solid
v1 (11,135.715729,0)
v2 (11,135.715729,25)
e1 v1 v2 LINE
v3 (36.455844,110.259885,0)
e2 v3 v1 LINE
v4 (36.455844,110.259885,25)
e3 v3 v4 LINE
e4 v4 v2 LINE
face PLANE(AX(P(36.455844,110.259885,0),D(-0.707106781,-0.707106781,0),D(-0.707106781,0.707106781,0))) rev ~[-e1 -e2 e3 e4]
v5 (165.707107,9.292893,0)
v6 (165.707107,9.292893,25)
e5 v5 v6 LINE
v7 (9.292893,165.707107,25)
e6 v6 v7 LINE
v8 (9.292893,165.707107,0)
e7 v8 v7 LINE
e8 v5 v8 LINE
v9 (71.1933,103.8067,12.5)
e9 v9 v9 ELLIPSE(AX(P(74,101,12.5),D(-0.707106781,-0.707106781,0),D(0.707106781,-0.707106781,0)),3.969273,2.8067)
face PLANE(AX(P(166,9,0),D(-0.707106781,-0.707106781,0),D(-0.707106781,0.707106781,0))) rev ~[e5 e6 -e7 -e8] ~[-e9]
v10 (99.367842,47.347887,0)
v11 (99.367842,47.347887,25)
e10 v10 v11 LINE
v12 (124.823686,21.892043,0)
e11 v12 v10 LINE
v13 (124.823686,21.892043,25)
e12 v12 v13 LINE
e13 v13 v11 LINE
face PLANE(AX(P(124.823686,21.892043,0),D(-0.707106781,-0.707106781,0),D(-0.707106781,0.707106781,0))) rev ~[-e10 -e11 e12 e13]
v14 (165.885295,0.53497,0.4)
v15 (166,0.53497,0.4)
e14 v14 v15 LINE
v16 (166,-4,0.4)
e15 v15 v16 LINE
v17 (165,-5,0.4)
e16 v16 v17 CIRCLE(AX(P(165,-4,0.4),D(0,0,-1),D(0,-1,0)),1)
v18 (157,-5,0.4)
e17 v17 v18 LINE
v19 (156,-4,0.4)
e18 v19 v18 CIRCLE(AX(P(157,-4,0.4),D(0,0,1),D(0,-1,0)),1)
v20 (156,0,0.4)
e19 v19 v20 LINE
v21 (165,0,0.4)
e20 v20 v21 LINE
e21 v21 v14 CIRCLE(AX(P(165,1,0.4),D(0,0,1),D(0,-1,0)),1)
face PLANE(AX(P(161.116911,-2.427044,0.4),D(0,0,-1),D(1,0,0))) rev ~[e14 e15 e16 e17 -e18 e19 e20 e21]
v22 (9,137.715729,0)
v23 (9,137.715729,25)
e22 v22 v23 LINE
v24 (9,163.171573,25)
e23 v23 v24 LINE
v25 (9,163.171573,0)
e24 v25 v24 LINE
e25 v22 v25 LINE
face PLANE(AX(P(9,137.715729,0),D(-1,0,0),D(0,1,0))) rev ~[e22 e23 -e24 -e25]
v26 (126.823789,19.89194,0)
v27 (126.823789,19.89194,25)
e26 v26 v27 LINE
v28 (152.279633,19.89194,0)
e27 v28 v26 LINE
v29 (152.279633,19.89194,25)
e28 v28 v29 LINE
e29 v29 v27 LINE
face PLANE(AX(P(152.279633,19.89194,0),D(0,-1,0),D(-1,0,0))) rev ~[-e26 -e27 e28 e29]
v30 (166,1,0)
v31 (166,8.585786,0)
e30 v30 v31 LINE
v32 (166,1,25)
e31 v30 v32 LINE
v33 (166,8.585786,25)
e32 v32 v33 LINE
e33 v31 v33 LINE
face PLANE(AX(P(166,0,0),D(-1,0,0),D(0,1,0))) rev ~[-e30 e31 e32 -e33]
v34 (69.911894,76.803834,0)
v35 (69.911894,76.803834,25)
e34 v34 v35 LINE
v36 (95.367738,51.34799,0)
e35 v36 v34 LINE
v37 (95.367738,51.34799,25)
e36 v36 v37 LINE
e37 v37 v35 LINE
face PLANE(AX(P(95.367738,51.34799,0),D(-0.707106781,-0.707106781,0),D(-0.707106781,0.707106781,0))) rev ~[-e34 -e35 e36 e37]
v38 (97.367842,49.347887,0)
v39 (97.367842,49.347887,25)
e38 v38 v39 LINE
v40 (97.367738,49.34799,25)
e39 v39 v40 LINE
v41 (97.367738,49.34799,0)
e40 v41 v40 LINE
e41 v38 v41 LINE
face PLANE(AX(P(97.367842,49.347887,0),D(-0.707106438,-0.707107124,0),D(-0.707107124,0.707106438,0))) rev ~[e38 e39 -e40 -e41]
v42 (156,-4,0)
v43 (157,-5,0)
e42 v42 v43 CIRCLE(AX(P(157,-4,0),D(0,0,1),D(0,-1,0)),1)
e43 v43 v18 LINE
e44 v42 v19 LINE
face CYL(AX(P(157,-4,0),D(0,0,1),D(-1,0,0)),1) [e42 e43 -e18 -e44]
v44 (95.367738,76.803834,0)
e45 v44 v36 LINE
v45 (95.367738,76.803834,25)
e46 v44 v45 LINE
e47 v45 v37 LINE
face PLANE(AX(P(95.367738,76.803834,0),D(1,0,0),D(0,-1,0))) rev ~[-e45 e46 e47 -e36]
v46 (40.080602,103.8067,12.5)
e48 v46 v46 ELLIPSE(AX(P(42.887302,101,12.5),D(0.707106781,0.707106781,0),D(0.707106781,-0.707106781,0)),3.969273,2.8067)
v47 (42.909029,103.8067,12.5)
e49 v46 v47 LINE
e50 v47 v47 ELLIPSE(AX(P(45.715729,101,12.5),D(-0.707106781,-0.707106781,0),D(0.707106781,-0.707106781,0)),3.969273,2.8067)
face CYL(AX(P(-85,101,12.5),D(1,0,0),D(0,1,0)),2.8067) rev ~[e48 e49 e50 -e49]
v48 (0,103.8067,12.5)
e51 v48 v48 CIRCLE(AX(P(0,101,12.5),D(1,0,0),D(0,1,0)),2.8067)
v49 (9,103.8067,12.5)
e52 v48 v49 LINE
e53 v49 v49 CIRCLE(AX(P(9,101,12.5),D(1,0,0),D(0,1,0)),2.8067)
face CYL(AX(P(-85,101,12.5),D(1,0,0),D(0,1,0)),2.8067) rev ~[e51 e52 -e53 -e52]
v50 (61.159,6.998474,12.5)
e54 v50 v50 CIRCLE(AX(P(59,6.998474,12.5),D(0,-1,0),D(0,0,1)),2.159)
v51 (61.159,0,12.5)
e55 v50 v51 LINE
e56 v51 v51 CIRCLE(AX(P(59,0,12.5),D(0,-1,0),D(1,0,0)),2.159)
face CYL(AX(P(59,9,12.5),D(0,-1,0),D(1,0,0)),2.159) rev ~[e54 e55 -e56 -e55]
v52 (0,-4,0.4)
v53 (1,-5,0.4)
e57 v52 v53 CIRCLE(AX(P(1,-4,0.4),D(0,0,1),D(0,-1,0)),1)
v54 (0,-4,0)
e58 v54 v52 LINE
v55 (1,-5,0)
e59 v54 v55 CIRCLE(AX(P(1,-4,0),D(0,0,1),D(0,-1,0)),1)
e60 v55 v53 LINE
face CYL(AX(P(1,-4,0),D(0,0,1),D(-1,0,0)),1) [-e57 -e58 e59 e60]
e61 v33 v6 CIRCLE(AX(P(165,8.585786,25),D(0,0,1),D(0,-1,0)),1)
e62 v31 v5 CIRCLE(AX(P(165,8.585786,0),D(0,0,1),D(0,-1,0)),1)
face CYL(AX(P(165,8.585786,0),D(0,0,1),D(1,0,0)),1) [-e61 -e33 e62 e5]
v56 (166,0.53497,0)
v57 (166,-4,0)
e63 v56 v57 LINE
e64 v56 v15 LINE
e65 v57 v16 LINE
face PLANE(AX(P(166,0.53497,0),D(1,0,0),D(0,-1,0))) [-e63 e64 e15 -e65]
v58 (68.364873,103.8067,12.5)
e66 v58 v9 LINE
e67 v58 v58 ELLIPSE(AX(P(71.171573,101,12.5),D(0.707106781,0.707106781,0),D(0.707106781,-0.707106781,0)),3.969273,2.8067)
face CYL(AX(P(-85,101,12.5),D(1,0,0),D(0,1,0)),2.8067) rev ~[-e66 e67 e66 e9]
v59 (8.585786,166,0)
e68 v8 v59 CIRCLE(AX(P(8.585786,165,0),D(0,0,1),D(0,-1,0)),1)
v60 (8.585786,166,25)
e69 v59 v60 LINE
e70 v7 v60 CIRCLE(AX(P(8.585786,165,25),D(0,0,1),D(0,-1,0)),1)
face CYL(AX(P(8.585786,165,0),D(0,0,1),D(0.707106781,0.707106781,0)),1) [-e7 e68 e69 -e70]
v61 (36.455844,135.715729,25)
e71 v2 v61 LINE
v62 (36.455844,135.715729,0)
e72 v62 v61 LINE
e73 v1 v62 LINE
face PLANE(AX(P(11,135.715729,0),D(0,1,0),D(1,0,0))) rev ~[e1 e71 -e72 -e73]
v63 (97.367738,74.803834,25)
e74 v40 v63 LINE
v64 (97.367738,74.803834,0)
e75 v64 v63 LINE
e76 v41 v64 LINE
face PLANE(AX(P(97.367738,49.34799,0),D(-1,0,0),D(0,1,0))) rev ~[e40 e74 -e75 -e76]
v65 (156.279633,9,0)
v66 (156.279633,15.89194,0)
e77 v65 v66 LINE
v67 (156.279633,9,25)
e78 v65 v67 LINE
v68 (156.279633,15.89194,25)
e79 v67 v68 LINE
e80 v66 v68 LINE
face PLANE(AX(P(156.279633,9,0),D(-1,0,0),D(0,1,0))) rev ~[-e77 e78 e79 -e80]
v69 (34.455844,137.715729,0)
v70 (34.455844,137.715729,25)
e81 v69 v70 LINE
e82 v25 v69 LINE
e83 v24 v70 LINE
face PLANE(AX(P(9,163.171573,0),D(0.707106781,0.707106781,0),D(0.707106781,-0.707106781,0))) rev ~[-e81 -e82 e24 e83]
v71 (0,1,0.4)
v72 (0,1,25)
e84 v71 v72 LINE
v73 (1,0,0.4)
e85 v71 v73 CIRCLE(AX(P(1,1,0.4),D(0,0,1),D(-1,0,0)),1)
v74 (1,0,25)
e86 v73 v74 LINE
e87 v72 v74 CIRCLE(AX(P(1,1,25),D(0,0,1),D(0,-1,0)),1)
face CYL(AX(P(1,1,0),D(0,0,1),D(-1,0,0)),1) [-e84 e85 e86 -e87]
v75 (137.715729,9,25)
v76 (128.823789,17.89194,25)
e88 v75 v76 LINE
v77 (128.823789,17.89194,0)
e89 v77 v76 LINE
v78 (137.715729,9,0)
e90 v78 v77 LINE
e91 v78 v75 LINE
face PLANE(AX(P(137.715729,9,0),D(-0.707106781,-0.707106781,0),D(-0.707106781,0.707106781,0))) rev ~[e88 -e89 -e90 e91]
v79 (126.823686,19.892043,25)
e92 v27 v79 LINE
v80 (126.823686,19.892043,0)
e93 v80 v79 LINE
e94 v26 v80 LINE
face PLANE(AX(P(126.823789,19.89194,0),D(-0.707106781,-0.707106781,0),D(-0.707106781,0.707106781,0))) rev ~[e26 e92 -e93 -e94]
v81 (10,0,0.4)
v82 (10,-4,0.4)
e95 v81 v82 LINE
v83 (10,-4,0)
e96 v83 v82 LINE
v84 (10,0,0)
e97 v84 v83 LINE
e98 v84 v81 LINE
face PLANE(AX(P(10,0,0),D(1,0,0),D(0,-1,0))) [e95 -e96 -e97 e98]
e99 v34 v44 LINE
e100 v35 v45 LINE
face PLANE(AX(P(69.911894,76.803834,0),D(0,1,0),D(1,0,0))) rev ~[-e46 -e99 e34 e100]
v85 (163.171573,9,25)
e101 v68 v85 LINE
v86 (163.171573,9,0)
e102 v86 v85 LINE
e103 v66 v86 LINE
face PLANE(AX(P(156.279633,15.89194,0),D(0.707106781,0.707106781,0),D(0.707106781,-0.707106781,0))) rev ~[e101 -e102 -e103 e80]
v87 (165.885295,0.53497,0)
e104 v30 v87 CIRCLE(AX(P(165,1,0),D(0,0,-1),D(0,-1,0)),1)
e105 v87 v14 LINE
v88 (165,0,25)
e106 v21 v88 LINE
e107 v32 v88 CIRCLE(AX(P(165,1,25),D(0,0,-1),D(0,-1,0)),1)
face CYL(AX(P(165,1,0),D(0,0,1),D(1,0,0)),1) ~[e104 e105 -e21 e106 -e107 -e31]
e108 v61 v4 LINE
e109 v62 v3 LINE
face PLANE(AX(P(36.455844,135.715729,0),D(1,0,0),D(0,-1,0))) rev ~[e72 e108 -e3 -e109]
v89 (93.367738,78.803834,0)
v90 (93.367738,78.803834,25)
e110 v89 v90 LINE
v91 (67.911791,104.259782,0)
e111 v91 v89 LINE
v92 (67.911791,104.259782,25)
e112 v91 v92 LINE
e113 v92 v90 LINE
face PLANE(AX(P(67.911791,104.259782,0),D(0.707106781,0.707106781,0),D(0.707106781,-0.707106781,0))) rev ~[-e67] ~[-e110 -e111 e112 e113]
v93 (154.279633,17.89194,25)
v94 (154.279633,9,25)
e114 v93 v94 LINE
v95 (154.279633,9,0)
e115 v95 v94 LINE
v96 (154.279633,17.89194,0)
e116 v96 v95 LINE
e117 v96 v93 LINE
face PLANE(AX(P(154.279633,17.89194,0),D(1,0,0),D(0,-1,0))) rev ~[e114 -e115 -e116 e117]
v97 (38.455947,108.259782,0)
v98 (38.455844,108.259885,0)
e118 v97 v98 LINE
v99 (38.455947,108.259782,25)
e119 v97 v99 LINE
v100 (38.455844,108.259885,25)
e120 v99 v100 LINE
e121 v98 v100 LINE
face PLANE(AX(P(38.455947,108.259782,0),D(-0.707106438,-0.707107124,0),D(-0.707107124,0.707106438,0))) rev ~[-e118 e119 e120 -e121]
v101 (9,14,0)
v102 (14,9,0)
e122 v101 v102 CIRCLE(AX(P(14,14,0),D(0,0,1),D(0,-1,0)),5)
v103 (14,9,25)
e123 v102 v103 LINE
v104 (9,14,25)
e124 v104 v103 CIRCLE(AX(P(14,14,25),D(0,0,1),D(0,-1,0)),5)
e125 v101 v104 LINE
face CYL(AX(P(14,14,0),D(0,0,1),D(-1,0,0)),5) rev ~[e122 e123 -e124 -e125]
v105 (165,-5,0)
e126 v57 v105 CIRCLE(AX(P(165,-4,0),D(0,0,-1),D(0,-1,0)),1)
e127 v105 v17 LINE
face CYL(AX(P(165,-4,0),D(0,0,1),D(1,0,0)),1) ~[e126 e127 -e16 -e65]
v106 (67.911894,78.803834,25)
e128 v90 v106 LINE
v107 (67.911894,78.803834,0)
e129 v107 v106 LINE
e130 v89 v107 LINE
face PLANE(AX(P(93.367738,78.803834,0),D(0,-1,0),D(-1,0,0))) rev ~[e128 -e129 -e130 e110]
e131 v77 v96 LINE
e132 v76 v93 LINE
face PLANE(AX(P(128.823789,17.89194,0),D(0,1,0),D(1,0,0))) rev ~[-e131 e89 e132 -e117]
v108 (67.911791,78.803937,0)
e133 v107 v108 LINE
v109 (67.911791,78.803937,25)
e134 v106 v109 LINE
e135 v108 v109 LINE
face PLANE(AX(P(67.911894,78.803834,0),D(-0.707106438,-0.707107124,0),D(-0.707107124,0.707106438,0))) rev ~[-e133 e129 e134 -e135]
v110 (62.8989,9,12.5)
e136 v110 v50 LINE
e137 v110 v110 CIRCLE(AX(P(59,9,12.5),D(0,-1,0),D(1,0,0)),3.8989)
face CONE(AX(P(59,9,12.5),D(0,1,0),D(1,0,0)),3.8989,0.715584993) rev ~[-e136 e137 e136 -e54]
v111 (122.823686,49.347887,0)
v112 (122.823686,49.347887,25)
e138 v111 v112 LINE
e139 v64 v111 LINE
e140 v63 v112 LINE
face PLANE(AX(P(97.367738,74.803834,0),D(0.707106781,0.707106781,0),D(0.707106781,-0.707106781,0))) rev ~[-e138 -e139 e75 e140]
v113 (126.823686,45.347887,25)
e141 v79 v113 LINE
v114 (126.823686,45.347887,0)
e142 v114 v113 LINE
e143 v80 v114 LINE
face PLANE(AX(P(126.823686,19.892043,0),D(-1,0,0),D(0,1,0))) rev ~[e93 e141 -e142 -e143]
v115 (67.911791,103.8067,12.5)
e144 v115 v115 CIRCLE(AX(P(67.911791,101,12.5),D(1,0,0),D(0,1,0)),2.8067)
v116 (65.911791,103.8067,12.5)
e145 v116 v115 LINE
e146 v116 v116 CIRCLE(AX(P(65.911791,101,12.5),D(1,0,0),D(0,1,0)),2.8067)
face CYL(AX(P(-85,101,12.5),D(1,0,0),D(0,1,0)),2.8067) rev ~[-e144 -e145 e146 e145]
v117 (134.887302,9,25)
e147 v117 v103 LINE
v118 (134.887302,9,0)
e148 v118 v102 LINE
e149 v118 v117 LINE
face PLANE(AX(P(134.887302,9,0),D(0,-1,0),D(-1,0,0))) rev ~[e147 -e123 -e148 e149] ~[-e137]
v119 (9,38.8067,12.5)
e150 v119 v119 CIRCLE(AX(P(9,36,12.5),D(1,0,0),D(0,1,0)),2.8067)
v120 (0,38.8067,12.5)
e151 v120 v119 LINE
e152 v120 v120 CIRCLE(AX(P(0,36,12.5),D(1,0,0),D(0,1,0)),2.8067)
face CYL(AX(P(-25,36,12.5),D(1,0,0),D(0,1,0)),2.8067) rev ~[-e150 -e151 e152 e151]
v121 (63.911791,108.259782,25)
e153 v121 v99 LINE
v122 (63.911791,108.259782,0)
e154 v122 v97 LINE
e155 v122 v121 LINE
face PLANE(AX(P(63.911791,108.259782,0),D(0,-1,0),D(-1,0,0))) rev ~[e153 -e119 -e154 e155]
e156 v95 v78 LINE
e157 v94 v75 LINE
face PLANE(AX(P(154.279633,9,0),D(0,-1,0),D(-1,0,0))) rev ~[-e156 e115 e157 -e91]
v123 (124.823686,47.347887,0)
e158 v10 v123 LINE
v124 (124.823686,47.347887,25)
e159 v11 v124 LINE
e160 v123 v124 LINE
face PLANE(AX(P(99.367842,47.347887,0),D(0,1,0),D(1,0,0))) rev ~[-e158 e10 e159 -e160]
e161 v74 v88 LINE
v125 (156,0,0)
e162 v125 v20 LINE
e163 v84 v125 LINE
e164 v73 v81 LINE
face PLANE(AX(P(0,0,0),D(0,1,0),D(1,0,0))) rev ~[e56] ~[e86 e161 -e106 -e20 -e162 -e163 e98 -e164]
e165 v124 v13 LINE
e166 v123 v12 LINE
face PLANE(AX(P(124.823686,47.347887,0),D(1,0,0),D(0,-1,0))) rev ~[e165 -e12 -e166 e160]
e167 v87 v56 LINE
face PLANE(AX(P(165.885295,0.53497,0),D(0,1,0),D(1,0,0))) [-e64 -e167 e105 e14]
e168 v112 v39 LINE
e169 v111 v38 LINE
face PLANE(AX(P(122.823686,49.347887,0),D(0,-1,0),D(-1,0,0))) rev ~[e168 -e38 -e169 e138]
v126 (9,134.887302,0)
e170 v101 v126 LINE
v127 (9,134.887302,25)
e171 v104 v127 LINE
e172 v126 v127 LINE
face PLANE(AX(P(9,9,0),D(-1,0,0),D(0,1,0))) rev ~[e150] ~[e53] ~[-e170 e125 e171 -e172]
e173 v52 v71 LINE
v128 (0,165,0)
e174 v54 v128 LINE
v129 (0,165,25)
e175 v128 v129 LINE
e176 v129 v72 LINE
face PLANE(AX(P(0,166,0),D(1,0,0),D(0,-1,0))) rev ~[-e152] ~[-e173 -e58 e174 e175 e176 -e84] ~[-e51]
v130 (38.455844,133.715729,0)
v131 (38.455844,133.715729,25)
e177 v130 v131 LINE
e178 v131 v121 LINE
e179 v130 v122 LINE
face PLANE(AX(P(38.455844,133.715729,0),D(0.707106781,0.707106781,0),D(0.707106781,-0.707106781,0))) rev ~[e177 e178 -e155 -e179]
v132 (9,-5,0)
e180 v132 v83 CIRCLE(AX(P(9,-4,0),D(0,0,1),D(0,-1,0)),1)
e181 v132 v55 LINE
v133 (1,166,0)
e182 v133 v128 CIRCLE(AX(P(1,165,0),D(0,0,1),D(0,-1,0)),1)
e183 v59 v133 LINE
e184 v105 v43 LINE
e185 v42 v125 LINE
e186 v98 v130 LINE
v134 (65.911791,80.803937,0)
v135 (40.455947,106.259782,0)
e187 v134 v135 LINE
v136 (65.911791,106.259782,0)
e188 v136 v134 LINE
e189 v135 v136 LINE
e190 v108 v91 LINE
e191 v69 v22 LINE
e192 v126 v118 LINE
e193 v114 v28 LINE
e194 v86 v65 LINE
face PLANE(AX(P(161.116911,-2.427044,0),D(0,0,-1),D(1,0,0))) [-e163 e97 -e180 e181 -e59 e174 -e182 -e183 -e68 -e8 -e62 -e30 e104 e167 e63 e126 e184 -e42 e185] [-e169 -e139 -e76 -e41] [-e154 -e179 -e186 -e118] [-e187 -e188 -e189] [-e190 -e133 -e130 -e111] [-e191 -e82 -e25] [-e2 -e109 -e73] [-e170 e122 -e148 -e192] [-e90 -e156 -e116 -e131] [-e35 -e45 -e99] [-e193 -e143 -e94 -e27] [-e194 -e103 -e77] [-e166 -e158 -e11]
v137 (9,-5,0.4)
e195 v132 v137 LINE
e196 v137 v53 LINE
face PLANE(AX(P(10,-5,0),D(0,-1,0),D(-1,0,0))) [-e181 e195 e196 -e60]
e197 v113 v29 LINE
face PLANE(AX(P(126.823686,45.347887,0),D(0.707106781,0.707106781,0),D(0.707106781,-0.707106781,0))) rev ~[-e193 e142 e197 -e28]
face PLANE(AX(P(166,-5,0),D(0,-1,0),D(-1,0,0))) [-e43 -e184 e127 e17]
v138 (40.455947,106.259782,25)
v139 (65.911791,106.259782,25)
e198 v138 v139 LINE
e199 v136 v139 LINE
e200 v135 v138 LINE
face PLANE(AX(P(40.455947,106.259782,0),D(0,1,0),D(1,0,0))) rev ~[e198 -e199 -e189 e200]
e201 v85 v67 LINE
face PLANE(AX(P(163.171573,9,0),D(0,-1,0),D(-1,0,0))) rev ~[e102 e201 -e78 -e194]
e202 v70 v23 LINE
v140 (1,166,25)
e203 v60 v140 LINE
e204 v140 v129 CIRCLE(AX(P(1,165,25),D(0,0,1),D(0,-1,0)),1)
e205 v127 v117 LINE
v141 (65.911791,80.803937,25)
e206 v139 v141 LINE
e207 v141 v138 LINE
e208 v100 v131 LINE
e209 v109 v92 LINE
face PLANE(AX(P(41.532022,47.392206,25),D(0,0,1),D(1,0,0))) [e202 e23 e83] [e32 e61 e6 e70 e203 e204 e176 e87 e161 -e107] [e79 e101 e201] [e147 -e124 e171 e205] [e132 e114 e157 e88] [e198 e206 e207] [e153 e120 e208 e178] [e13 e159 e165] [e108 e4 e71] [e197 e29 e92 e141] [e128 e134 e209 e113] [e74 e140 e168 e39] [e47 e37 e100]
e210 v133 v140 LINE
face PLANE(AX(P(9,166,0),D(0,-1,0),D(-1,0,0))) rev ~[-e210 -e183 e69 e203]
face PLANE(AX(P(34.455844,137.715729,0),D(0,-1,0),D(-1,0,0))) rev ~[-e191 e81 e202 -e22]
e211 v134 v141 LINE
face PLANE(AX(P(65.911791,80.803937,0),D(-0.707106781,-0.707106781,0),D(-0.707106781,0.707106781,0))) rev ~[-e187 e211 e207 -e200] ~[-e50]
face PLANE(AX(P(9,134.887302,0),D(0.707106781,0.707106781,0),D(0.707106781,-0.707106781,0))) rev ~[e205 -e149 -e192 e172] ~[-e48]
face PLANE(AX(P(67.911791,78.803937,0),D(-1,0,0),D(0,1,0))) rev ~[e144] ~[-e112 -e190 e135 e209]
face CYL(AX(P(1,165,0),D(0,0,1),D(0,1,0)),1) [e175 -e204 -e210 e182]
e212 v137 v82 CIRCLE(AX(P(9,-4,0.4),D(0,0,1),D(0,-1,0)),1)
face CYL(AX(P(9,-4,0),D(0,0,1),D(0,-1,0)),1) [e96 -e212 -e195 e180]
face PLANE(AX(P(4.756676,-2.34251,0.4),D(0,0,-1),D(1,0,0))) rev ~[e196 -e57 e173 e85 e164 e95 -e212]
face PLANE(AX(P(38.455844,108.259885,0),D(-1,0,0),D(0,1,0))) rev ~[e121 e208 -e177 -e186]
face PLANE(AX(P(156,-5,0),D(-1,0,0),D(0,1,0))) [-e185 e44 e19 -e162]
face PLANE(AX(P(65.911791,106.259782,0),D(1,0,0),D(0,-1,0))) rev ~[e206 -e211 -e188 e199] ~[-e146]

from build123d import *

# Parameters (mm, degrees)
F0_W           = 2
F0_H           = 9
F1_DEPTH       = 25
F3_D           = 5.6134
F3_DEPTH       = 25
F3_TIP         = 1.6864354994
F5_D           = 5.6134
F5_DEPTH       = 85
F5_TIP         = 1.6864354994
F7_D           = 4.318
F7_DEPTH       = 25
F7_CSINK_D     = 7.7978
F7_CSINK_ANGLE = 82
F7_TIP         = 1.2972580765
F8_R           = 5
F9_R           = 1
F11_DEPTH      = 0.4
F12_R          = 1


# Not quite as in the source:
# - a feature names something its author has since deleted; it is built from what else it names


with BuildPart() as f1:
    # F0 (on Top) → F1 (new body)
    with BuildSketch(Plane.XY):
        Polygon((0, 166), (0, 0), (154.2796328583, 0), (154.2796328583, 9), (137.7157287525, 9), (134.8873016278, 9), (9, 9), (9, 134.8873016278), (9, 137.7157287525), (9, 138.1715728753), (9, 163.1715728753), (9, 166), align=None)
        Polygon((36.4558441227, 135.7157287525), (34.4558441227, 137.7157287525), (9, 137.7157287525), (11, 135.7157287525), align=None)
        Polygon((38.4558441227, 133.7157287525), (36.4558441227, 135.7157287525), (36.4558441227, 110.2598846298), (38.4558441227, 108.2598846298), align=None)
        Polygon((134.8873016278, 9), (137.7157287525, 9), (128.8237887356, 17.891940017), (126.8237887356, 19.891940017), (126.8236856744, 19.8920430782), (124.8236856744, 21.8920430782), (99.3678415517, 47.3478872009), (97.3678415517, 49.3478872009), (97.3677384905, 49.347990262), (95.3677384905, 51.347990262), (69.9118943678, 76.8038343848), (67.9118943678, 78.8038343848), (67.9117913066, 78.8039374459), (65.9117913066, 80.8039374459), (40.4559471839, 106.2597815687), (38.4559471839, 108.2597815687), (38.4558441227, 108.2598846298), (36.4558441227, 110.2598846298), (11, 135.7157287525), (9, 137.7157287525), (9, 134.8873016278), align=None)
        Polygon((166, 9), (9, 166), (9, 163.1715728753), (34.4558441227, 137.7157287525), (36.4558441227, 135.7157287525), (38.4558441227, 133.7157287525), (63.9117913066, 108.2597815687), (65.9117913066, 106.2597815687), (67.9117913066, 104.2597815687), (93.3677384905, 78.8038343848), (95.3677384905, 76.8038343848), (97.3677384905, 74.8038343848), (122.8236856744, 49.3478872009), (124.8236856744, 47.3478872009), (126.8236856744, 45.3478872009), (150.2702352589, 21.9013376164), (152.2796328583, 19.891940017), (154.2796328583, 17.891940017), (156.2796328583, 15.891940017), (163.1715728753, 9), align=None)
        Polygon((65.9117913066, 106.2597815687), (63.9117913066, 108.2597815687), (38.4559471839, 108.2597815687), (40.4559471839, 106.2597815687), align=None)
        Polygon((67.9117913066, 104.2597815687), (65.9117913066, 106.2597815687), (65.9117913066, 80.8039374459), (67.9117913066, 78.8039374459), align=None)
        Polygon((95.3677384905, 76.8038343848), (93.3677384905, 78.8038343848), (67.9118943678, 78.8038343848), (69.9118943678, 76.8038343848), align=None)
        Polygon((97.3677384905, 49.347990262), (97.3677384905, 74.8038343848), (95.3677384905, 76.8038343848), (95.3677384905, 51.347990262), align=None)
        Polygon((99.3678415517, 47.3478872009), (124.8236856744, 47.3478872009), (122.8236856744, 49.3478872009), (97.3678415517, 49.3478872009), align=None)
        Polygon((124.8236856744, 21.8920430782), (126.8236856744, 19.8920430782), (126.8236856744, 45.3478872009), (124.8236856744, 47.3478872009), align=None)
        Polygon((128.8237887356, 17.891940017), (154.2796328583, 17.891940017), (152.2796328583, 19.891940017), (126.8237887356, 19.891940017), align=None)
        Polygon((154.2796328583, 17.891940017), (154.2796328583, 9), (156.2796328583, 9), (156.2796328583, 15.891940017), align=None)
        with Locations((155.2796328583, 4.5)):
            Rectangle(F0_W, F0_H)
        Polygon((156.2796328583, 9), (156.2796328583, 0), (166, 0), (166, 6.1715728753), (163.1715728753, 9), align=None)
        Polygon((166, 6.1715728753), (166, 9), (163.1715728753, 9), align=None)
    extrude(amount=F1_DEPTH)

    # F3
    with Locations(Plane(origin=(0, 0, 0), x_dir=(0, -1, 0), z_dir=(-1, 0, 0))):
        with Locations((-36, 12.5)):
            Hole(F3_D / 2, depth=F3_DEPTH)
            with Locations((0, 0, -(F3_DEPTH + F3_TIP / 2))):  # 118° drill point
                Cone(0, F3_D / 2, F3_TIP, mode=Mode.SUBTRACT)

    # F5
    with Locations(Plane(origin=(0, 0, 0), x_dir=(0, -1, 0), z_dir=(-1, 0, 0))):
        with Locations((-101, 12.5)):
            Hole(F5_D / 2, depth=F5_DEPTH)
            with Locations((0, 0, -(F5_DEPTH + F5_TIP / 2))):  # 118° drill point
                Cone(0, F5_D / 2, F5_TIP, mode=Mode.SUBTRACT)

    # F7
    with Locations(Plane(origin=(0, 9, 0), x_dir=(-1, 0, 0), z_dir=(0, 1, 0))):
        with Locations((-59, 12.5)):
            CounterSinkHole(F7_D / 2, F7_CSINK_D / 2, depth=F7_DEPTH, counter_sink_angle=F7_CSINK_ANGLE)
            with Locations((0, 0, -(F7_DEPTH + F7_TIP / 2))):  # 118° drill point
                Cone(0, F7_D / 2, F7_TIP, mode=Mode.SUBTRACT)

    # F8
    f8_edges = [f1.edges().sort_by_distance(p)[0] for p in [
        (9, 9, 12.5),
    ]]
    fillet(f8_edges, radius=F8_R)

    # F9
    f9_edges = [f1.edges().sort_by_distance(p)[0] for p in [
        (166, 9, 12.5),
        (166, 0, 12.5),
        (0, 0, 12.5),
        (0, 166, 12.5),
        (9, 166, 12.5),
    ]]
    fillet(f9_edges, radius=F9_R)

    # F10 (on face) → F11 (join)
    with BuildSketch(Plane(origin=(0, 0, 0), x_dir=(1, 0, 0), z_dir=(0, 0, -1))):
        with BuildLine():
            Line((156, 5), (156, 0))
            Line((156, 0), (165, 0))
            ThreePointArc((165, 0), (165.5171897304, -0.1441292254), (165.8852951503, -0.5349704344))
            Line((165.8852951503, -0.5349704344), (166, -0.5349704344))
            Line((166, -0.5349704344), (166, 5))
            Line((166, 5), (156, 5))
        make_face()
        with BuildLine():
            Line((0, 5), (0, -1))
            ThreePointArc((0, -1), (0.2928932188, -0.2928932188), (1, 0))
            Line((1, 0), (10, 0))
            Line((10, 0), (10, 5))
            Line((10, 5), (0, 5))
        make_face()
    extrude(amount=-F11_DEPTH)

    # F12
    f12_edges = [f1.edges().sort_by_distance(p)[0] for p in [
        (166, -5, 0.2),
        (156, -5, 0.2),
        (0, -5, 0.2),
        (10, -5, 0.2),
    ]]
    fillet(f12_edges, radius=F12_R)


solid = f1.part
